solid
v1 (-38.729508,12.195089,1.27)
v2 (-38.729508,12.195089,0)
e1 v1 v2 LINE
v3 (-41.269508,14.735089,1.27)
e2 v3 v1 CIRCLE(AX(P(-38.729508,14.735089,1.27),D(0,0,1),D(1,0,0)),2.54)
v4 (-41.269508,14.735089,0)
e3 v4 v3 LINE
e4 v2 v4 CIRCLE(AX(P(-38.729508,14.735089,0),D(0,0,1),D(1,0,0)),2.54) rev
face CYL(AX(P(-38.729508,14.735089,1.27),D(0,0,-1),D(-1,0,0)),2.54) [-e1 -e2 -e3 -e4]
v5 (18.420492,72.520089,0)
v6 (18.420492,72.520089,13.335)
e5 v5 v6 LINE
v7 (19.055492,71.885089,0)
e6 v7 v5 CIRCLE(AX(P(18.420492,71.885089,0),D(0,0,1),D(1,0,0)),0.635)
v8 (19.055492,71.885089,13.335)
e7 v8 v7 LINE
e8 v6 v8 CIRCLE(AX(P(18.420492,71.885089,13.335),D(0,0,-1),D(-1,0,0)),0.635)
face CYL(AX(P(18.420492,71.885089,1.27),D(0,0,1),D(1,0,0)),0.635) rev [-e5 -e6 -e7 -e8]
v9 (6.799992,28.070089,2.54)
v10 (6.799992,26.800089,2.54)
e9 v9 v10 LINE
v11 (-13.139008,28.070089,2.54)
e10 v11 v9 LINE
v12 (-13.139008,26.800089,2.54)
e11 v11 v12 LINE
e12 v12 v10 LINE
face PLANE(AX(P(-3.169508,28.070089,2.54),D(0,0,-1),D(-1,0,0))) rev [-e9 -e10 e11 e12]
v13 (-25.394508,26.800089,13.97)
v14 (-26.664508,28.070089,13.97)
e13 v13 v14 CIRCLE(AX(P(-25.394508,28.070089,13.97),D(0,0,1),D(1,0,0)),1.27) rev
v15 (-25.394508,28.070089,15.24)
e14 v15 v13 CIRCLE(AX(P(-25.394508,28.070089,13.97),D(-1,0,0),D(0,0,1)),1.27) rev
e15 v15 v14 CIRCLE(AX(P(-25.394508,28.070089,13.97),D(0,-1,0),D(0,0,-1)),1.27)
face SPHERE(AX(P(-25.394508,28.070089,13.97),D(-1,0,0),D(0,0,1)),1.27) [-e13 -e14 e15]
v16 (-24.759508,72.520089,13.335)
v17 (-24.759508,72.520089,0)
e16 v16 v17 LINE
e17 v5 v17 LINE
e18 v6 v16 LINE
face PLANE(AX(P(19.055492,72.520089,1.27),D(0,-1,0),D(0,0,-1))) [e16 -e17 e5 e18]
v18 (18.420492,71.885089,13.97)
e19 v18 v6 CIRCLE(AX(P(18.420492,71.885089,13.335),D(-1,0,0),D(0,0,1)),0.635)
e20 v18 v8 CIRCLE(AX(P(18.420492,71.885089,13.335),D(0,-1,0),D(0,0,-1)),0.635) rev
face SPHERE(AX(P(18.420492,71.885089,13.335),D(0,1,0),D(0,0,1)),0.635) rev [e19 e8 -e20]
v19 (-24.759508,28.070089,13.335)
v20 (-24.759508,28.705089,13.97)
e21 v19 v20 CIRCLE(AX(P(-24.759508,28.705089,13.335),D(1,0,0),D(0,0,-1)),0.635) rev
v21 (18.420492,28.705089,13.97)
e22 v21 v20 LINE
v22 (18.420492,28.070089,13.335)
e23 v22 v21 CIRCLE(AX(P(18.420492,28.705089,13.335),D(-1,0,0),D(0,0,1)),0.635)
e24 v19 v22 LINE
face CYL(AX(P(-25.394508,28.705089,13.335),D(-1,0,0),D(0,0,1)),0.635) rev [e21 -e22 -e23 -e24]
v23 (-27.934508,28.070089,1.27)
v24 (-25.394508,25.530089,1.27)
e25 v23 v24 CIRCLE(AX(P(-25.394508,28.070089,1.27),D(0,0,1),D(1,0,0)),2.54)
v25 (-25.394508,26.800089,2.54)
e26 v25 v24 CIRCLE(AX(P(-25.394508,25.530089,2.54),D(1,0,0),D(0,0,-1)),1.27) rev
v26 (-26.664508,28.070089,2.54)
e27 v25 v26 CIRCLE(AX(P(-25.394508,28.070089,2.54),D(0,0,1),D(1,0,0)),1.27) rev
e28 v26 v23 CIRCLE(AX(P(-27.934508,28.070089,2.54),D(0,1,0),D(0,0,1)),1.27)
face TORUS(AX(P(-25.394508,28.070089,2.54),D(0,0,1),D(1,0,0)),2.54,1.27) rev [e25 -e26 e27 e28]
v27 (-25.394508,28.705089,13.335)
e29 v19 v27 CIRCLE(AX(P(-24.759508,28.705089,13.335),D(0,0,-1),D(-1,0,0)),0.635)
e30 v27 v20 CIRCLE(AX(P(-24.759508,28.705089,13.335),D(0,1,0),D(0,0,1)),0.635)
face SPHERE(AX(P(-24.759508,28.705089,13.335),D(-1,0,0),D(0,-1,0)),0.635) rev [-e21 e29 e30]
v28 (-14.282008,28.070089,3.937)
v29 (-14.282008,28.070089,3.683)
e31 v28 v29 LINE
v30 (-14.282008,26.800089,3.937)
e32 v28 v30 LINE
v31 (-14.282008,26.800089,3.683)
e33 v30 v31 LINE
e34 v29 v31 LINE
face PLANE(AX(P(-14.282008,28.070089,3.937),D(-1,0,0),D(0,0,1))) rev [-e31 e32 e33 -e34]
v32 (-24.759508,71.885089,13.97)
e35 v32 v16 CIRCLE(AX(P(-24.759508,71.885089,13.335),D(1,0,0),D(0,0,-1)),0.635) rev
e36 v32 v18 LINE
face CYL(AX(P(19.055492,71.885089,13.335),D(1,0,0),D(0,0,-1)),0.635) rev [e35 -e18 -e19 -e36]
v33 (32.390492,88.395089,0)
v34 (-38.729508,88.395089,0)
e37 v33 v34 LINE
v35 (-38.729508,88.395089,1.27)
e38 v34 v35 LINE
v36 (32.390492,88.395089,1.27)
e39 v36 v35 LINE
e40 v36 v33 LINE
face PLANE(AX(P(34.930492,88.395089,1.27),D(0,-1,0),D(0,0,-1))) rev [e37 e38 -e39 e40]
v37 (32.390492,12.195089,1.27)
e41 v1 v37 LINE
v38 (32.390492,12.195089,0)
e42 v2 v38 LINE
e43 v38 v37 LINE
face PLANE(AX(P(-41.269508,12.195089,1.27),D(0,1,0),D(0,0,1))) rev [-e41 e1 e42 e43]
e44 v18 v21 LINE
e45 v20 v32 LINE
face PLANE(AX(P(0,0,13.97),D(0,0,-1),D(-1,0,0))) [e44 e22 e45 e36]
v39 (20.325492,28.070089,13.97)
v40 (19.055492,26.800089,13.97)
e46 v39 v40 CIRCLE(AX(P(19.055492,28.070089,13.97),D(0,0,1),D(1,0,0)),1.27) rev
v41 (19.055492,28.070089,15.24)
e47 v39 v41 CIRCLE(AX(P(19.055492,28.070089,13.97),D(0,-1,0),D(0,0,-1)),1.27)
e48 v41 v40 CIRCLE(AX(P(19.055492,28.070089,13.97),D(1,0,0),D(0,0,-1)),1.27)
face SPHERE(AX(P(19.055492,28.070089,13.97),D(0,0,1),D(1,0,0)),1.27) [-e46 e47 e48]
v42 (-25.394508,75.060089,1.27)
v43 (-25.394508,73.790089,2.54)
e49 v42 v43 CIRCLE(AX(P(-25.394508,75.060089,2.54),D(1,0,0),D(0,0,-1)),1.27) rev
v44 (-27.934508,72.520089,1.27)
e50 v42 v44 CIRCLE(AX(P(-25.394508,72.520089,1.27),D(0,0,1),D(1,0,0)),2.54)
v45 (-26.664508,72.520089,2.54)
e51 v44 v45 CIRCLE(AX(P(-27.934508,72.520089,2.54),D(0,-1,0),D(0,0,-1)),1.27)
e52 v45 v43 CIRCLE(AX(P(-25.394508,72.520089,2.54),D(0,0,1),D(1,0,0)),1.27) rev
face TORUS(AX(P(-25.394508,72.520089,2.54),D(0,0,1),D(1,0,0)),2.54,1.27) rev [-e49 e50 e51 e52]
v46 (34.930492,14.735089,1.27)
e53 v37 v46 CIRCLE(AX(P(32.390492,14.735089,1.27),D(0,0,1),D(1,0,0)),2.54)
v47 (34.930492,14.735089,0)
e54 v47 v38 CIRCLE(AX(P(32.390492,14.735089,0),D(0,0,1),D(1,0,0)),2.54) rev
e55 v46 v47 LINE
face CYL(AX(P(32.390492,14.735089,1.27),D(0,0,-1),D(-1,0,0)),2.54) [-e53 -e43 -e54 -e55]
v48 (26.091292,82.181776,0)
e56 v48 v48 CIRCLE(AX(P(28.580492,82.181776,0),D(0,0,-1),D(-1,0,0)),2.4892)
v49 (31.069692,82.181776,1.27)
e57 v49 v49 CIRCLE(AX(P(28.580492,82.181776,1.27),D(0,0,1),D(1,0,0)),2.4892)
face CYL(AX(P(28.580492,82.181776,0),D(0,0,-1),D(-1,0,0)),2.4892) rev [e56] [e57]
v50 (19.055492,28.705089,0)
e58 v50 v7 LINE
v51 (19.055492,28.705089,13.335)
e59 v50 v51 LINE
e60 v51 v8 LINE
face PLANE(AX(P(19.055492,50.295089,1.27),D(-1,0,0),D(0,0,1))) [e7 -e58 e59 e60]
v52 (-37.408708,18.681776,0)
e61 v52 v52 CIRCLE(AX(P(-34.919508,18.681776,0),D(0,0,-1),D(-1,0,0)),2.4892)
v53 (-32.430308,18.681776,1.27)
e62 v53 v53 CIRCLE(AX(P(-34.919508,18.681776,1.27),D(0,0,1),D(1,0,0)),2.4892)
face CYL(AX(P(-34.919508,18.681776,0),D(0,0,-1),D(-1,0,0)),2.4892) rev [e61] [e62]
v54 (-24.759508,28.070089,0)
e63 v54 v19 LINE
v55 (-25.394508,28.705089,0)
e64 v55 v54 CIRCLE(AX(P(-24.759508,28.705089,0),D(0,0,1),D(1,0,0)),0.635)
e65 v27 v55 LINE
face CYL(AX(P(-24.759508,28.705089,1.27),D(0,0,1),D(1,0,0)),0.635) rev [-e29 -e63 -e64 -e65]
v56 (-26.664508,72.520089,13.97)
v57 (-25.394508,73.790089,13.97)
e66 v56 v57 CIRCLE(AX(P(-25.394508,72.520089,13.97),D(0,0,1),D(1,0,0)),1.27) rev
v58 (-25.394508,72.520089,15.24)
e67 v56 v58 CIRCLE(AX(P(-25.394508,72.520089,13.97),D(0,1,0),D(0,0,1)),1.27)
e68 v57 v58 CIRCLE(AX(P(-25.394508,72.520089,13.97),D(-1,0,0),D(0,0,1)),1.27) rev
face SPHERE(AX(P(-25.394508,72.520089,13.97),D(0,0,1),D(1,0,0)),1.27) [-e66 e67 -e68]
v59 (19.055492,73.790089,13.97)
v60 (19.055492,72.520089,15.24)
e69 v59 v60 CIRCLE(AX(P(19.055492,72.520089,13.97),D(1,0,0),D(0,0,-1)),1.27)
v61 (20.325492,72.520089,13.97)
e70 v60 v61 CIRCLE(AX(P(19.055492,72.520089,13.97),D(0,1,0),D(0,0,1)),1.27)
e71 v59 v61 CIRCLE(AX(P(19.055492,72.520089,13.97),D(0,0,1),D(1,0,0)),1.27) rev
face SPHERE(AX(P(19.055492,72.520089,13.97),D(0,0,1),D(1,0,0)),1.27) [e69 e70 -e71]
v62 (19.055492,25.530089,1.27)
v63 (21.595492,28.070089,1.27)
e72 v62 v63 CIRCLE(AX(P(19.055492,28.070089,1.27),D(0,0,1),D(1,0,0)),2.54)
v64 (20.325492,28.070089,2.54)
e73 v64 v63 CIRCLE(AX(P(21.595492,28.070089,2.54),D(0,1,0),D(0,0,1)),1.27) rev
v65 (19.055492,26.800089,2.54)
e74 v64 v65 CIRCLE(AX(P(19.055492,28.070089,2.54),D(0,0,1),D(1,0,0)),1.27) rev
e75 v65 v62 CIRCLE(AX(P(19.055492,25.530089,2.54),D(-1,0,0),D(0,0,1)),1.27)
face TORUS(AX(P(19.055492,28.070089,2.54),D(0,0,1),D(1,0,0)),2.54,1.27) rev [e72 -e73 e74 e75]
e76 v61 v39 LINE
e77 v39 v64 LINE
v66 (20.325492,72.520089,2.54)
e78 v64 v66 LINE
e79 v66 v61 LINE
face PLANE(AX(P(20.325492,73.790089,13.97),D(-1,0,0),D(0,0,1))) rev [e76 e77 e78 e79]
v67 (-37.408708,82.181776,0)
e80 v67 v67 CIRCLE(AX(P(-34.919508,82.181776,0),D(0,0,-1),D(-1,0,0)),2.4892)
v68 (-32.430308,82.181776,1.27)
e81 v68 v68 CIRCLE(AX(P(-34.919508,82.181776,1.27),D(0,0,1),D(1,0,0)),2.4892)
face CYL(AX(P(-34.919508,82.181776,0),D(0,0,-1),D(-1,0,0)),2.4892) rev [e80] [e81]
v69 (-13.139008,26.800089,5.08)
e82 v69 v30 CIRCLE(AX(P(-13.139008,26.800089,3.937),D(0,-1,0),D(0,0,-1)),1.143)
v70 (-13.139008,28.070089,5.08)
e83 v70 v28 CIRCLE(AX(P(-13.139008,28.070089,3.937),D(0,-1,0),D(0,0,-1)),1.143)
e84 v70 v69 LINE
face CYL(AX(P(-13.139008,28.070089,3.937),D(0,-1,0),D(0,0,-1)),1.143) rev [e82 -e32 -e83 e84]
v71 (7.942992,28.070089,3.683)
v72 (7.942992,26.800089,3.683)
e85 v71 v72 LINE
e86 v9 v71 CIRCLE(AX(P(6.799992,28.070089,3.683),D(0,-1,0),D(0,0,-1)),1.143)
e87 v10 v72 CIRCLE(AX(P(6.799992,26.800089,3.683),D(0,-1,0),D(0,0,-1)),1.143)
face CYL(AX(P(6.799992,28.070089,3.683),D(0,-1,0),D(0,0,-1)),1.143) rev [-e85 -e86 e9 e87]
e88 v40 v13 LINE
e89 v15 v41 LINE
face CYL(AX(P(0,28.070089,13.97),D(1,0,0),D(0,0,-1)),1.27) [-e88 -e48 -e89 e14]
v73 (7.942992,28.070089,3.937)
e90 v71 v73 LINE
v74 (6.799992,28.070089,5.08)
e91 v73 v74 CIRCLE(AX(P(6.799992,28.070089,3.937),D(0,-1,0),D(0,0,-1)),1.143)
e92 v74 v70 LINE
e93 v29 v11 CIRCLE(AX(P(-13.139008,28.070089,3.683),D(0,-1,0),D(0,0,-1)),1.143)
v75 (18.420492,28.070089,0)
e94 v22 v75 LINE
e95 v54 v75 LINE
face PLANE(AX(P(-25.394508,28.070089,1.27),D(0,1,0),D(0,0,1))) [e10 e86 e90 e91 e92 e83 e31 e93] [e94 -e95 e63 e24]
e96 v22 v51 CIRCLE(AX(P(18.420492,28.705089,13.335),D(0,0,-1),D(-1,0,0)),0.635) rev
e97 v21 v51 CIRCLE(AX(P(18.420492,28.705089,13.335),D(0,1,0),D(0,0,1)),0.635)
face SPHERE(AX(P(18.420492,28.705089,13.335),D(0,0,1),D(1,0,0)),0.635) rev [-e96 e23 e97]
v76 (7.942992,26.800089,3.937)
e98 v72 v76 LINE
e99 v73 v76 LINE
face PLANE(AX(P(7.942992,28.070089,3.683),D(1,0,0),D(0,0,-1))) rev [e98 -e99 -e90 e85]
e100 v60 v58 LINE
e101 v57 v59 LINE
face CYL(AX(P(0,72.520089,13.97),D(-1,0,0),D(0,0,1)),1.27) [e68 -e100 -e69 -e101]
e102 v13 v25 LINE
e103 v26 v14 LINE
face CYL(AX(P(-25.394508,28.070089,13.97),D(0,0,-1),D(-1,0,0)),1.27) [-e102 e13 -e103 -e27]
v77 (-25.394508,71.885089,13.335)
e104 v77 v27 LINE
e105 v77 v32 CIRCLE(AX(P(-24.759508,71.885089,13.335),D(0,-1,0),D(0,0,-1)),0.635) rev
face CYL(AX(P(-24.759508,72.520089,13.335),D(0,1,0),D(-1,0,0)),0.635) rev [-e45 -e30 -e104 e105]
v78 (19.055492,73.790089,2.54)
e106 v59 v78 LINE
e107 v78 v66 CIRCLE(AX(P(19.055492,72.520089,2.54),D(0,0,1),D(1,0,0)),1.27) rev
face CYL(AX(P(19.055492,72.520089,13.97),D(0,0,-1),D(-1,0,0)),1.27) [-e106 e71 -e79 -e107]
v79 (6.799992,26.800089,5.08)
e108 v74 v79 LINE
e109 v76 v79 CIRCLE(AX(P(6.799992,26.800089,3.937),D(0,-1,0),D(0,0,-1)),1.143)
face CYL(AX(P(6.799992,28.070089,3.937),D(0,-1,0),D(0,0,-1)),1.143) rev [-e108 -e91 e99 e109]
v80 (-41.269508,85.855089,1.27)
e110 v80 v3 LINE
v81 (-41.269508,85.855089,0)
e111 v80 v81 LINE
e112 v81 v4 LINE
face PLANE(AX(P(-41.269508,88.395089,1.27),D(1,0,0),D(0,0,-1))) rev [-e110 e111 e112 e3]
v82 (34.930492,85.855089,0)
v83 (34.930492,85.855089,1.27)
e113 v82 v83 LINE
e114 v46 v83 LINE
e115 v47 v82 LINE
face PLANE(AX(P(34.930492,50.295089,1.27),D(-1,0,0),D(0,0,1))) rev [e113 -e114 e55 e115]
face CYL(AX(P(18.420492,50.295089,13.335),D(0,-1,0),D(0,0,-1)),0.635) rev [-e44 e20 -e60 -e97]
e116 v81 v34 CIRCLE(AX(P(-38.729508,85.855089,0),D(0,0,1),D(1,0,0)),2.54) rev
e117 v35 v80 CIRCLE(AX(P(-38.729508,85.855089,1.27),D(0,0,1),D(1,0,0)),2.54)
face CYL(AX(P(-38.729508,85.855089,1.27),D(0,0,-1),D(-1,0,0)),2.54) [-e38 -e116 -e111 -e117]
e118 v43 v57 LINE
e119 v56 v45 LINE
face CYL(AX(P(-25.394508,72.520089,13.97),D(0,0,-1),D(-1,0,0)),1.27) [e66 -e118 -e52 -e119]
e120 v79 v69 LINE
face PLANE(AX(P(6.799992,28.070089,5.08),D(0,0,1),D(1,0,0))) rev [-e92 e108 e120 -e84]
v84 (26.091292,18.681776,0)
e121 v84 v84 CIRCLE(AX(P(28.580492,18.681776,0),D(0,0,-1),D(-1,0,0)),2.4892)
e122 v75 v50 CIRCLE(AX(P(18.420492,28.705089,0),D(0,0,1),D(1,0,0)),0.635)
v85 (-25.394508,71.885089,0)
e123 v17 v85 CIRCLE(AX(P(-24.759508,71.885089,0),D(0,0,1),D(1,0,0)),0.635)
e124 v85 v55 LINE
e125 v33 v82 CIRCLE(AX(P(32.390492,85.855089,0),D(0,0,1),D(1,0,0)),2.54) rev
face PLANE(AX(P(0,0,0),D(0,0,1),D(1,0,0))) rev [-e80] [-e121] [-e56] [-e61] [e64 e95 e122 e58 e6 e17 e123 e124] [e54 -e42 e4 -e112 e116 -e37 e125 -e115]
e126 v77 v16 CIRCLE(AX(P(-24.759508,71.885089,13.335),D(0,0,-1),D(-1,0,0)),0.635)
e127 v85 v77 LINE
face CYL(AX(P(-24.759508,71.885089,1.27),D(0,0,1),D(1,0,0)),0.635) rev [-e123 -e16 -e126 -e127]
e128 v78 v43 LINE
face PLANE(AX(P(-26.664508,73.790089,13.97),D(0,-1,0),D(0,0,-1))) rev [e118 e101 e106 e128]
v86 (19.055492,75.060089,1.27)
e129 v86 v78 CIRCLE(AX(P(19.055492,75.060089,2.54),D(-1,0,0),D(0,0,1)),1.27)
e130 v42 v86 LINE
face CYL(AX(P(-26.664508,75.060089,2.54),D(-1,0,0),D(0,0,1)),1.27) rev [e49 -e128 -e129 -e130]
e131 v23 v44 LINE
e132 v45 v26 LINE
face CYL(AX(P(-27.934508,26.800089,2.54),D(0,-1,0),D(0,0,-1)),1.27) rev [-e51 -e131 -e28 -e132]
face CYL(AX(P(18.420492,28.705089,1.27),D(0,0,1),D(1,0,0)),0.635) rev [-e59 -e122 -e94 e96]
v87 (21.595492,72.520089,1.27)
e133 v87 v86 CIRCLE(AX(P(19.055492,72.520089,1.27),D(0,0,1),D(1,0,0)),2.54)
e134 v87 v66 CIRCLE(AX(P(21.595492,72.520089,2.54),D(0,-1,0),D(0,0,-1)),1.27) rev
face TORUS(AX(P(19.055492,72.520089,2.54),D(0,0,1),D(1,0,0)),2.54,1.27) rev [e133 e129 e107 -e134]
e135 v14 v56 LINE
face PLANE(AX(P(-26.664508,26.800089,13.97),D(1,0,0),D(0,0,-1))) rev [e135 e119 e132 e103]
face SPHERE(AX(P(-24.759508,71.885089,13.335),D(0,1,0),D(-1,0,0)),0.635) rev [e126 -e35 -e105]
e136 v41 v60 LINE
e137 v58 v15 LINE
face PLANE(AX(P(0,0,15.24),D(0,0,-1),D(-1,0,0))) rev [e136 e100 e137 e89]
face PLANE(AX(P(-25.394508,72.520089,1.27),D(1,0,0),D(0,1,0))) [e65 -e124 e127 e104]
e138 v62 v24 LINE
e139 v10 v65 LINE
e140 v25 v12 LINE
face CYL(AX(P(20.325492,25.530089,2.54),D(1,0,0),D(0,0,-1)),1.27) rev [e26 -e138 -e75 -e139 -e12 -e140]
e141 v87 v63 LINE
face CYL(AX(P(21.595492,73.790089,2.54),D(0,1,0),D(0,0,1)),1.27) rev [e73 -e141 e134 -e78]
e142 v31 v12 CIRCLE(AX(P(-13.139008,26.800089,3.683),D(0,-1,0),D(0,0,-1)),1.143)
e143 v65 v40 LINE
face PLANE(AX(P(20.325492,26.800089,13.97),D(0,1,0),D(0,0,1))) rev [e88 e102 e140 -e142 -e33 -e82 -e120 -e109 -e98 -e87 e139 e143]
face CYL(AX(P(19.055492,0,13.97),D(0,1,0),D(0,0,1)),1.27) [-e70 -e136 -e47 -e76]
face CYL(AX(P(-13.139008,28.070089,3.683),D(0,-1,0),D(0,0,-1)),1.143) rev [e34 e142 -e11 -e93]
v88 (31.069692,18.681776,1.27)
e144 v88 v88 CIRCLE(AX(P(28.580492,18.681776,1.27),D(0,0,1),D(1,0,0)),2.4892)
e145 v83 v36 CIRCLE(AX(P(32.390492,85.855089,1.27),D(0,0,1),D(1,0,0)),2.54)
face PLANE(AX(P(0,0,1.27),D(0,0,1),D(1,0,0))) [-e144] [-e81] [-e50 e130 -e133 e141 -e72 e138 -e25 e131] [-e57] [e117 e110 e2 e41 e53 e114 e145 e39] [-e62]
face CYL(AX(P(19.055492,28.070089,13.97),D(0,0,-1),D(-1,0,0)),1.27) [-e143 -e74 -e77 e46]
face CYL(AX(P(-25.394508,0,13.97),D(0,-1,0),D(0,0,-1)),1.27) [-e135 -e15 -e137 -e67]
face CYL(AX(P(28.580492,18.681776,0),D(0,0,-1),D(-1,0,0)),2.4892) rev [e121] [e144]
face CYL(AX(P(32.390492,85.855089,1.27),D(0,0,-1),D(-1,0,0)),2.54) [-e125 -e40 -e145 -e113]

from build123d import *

# Parameters (mm, degrees)
BOSS_EXTRUDE1_DEPTH    = 1.27
SKETCH2_W              = 46.99
SKETCH2_H              = 46.99
SKETCH2_W_2            = 44.45
SKETCH2_H_2            = 44.45
BOSS_EXTRUDE2_DEPTH    = 12.7
SKETCH3_W              = 46.99
SKETCH3_H              = 46.99
BOSS_EXTRUDE3_DEPTH    = 1.27
CUT_EXTRUDE1_DEPTH     = 1.27
F_10_CLEARANCE_HOLE1_D = 4.9784
FILLET1_R              = 2.54
FILLET2_R              = 1.27
FILLET3_R              = 0.635


with BuildPart() as part:
    # Sketch1 → Boss-Extrude1 (new body)
    with BuildSketch(Plane.XY):
        Polygon((34.930491901, 50.295089045), (34.930491901, 88.395089045), (-41.269508099, 88.395089045), (-41.269508099, 12.195089045), (34.930491901, 12.195089045), align=None)
        Polygon((19.055491901, 50.295089045), (19.055491901, 72.520089045), (-25.394508099, 72.520089045), (-25.394508099, 28.070089045), (19.055491901, 28.070089045), align=None, mode=Mode.SUBTRACT)
    extrude(amount=BOSS_EXTRUDE1_DEPTH)

    # Sketch2 → Boss-Extrude2 (add)
    with BuildSketch(Plane.XY.offset(1.27)):
        with Locations((-3.169508099, 50.295089045)):
            Rectangle(SKETCH2_W, SKETCH2_H)
        with Locations((-3.169508099, 50.295089045)):
            Rectangle(SKETCH2_W_2, SKETCH2_H_2, mode=Mode.SUBTRACT)
    extrude(amount=BOSS_EXTRUDE2_DEPTH)

    # Sketch3 → Boss-Extrude3 (add)
    with BuildSketch(Plane.XY.offset(13.97)):
        with Locations((-3.169508099, 50.295089045)):
            Rectangle(SKETCH3_W, SKETCH3_H)
    extrude(amount=BOSS_EXTRUDE3_DEPTH)

    # Sketch4 → Cut-Extrude1 (cut)
    with BuildSketch(Plane.XZ.offset(-26.800089045)):
        with BuildLine():
            Line((-3.169508099, 2.54), (6.799991901, 2.54))
            ThreePointArc((6.799991901, 2.54), (7.608214952, 2.874776949), (7.942991901, 3.683))
            Line((7.942991901, 3.683), (7.942991901, 3.937))
            ThreePointArc((7.942991901, 3.937), (7.608214952, 4.745223051), (6.799991901, 5.08))
            Line((6.799991901, 5.08), (-13.139008099, 5.08))
            ThreePointArc((-13.139008099, 5.08), (-13.94723115, 4.745223051), (-14.282008099, 3.937))
            Line((-14.282008099, 3.937), (-14.282008099, 3.683))
            ThreePointArc((-14.282008099, 3.683), (-13.94723115, 2.874776949), (-13.139008099, 2.54))
            Line((-13.139008099, 2.54), (-3.169508099, 2.54))
        make_face()
    extrude(amount=-CUT_EXTRUDE1_DEPTH, mode=Mode.SUBTRACT)

    # #10 Clearance Hole1 (through all)
    with Locations(Plane(origin=(0, 0, 0), x_dir=(-1, 0, 0), z_dir=(0, 0, -1))):
        with Locations((-28.580491901, 82.181775554), (34.919508099, 82.181775554), (34.919508099, 18.681775554), (-28.580491901, 18.681775554)):
            Hole(F_10_CLEARANCE_HOLE1_D / 2)

    # Fillet1
    fillet1_edges = [part.edges().sort_by_distance(p)[0] for p in [
        (34.930491901, 12.195089045, 0.635),
        (-41.269508099, 12.195089045, 0.635),
        (-41.269508099, 88.395089045, 0.635),
        (34.930491901, 88.395089045, 0.635),
    ]]
    fillet(fillet1_edges, radius=FILLET1_R)

    # Fillet2
    fillet2_edges = [part.edges().sort_by_distance(p)[0] for p in [
        (-3.169508099, 73.790089045, 1.27),
        (20.325491901, 73.790089045, 8.255),
        (-26.664508099, 50.295089045, 1.27),
        (-26.664508099, 73.790089045, 8.255),
        (-3.169508099, 26.800089045, 1.27),
        (-26.664508099, 26.800089045, 8.255),
        (20.325491901, 50.295089045, 1.27),
        (20.325491901, 26.800089045, 8.255),
        (20.325491901, 50.295089045, 15.24),
        (-3.169508099, 73.790089045, 15.24),
        (-26.664508099, 50.295089045, 15.24),
        (-3.169508099, 26.800089045, 15.24),
    ]]
    fillet(fillet2_edges, radius=FILLET2_R - 0.0001)  # a hair under: the kernel refuses the full size

    # Fillet3
    fillet3_edges = [part.edges().sort_by_distance(p)[0] for p in [
        (19.055491901, 28.070089045, 6.985),
        (19.055491901, 72.520089045, 6.985),
        (-25.394508099, 72.520089045, 6.985),
        (-25.394508099, 28.070089045, 6.985),
        (19.055491901, 50.295089045, 13.97),
        (-3.169508099, 72.520089045, 13.97),
        (-25.394508099, 50.295089045, 13.97),
        (-3.169508099, 28.070089045, 13.97),
    ]]
    fillet(fillet3_edges, radius=FILLET3_R)


solid = part.part
